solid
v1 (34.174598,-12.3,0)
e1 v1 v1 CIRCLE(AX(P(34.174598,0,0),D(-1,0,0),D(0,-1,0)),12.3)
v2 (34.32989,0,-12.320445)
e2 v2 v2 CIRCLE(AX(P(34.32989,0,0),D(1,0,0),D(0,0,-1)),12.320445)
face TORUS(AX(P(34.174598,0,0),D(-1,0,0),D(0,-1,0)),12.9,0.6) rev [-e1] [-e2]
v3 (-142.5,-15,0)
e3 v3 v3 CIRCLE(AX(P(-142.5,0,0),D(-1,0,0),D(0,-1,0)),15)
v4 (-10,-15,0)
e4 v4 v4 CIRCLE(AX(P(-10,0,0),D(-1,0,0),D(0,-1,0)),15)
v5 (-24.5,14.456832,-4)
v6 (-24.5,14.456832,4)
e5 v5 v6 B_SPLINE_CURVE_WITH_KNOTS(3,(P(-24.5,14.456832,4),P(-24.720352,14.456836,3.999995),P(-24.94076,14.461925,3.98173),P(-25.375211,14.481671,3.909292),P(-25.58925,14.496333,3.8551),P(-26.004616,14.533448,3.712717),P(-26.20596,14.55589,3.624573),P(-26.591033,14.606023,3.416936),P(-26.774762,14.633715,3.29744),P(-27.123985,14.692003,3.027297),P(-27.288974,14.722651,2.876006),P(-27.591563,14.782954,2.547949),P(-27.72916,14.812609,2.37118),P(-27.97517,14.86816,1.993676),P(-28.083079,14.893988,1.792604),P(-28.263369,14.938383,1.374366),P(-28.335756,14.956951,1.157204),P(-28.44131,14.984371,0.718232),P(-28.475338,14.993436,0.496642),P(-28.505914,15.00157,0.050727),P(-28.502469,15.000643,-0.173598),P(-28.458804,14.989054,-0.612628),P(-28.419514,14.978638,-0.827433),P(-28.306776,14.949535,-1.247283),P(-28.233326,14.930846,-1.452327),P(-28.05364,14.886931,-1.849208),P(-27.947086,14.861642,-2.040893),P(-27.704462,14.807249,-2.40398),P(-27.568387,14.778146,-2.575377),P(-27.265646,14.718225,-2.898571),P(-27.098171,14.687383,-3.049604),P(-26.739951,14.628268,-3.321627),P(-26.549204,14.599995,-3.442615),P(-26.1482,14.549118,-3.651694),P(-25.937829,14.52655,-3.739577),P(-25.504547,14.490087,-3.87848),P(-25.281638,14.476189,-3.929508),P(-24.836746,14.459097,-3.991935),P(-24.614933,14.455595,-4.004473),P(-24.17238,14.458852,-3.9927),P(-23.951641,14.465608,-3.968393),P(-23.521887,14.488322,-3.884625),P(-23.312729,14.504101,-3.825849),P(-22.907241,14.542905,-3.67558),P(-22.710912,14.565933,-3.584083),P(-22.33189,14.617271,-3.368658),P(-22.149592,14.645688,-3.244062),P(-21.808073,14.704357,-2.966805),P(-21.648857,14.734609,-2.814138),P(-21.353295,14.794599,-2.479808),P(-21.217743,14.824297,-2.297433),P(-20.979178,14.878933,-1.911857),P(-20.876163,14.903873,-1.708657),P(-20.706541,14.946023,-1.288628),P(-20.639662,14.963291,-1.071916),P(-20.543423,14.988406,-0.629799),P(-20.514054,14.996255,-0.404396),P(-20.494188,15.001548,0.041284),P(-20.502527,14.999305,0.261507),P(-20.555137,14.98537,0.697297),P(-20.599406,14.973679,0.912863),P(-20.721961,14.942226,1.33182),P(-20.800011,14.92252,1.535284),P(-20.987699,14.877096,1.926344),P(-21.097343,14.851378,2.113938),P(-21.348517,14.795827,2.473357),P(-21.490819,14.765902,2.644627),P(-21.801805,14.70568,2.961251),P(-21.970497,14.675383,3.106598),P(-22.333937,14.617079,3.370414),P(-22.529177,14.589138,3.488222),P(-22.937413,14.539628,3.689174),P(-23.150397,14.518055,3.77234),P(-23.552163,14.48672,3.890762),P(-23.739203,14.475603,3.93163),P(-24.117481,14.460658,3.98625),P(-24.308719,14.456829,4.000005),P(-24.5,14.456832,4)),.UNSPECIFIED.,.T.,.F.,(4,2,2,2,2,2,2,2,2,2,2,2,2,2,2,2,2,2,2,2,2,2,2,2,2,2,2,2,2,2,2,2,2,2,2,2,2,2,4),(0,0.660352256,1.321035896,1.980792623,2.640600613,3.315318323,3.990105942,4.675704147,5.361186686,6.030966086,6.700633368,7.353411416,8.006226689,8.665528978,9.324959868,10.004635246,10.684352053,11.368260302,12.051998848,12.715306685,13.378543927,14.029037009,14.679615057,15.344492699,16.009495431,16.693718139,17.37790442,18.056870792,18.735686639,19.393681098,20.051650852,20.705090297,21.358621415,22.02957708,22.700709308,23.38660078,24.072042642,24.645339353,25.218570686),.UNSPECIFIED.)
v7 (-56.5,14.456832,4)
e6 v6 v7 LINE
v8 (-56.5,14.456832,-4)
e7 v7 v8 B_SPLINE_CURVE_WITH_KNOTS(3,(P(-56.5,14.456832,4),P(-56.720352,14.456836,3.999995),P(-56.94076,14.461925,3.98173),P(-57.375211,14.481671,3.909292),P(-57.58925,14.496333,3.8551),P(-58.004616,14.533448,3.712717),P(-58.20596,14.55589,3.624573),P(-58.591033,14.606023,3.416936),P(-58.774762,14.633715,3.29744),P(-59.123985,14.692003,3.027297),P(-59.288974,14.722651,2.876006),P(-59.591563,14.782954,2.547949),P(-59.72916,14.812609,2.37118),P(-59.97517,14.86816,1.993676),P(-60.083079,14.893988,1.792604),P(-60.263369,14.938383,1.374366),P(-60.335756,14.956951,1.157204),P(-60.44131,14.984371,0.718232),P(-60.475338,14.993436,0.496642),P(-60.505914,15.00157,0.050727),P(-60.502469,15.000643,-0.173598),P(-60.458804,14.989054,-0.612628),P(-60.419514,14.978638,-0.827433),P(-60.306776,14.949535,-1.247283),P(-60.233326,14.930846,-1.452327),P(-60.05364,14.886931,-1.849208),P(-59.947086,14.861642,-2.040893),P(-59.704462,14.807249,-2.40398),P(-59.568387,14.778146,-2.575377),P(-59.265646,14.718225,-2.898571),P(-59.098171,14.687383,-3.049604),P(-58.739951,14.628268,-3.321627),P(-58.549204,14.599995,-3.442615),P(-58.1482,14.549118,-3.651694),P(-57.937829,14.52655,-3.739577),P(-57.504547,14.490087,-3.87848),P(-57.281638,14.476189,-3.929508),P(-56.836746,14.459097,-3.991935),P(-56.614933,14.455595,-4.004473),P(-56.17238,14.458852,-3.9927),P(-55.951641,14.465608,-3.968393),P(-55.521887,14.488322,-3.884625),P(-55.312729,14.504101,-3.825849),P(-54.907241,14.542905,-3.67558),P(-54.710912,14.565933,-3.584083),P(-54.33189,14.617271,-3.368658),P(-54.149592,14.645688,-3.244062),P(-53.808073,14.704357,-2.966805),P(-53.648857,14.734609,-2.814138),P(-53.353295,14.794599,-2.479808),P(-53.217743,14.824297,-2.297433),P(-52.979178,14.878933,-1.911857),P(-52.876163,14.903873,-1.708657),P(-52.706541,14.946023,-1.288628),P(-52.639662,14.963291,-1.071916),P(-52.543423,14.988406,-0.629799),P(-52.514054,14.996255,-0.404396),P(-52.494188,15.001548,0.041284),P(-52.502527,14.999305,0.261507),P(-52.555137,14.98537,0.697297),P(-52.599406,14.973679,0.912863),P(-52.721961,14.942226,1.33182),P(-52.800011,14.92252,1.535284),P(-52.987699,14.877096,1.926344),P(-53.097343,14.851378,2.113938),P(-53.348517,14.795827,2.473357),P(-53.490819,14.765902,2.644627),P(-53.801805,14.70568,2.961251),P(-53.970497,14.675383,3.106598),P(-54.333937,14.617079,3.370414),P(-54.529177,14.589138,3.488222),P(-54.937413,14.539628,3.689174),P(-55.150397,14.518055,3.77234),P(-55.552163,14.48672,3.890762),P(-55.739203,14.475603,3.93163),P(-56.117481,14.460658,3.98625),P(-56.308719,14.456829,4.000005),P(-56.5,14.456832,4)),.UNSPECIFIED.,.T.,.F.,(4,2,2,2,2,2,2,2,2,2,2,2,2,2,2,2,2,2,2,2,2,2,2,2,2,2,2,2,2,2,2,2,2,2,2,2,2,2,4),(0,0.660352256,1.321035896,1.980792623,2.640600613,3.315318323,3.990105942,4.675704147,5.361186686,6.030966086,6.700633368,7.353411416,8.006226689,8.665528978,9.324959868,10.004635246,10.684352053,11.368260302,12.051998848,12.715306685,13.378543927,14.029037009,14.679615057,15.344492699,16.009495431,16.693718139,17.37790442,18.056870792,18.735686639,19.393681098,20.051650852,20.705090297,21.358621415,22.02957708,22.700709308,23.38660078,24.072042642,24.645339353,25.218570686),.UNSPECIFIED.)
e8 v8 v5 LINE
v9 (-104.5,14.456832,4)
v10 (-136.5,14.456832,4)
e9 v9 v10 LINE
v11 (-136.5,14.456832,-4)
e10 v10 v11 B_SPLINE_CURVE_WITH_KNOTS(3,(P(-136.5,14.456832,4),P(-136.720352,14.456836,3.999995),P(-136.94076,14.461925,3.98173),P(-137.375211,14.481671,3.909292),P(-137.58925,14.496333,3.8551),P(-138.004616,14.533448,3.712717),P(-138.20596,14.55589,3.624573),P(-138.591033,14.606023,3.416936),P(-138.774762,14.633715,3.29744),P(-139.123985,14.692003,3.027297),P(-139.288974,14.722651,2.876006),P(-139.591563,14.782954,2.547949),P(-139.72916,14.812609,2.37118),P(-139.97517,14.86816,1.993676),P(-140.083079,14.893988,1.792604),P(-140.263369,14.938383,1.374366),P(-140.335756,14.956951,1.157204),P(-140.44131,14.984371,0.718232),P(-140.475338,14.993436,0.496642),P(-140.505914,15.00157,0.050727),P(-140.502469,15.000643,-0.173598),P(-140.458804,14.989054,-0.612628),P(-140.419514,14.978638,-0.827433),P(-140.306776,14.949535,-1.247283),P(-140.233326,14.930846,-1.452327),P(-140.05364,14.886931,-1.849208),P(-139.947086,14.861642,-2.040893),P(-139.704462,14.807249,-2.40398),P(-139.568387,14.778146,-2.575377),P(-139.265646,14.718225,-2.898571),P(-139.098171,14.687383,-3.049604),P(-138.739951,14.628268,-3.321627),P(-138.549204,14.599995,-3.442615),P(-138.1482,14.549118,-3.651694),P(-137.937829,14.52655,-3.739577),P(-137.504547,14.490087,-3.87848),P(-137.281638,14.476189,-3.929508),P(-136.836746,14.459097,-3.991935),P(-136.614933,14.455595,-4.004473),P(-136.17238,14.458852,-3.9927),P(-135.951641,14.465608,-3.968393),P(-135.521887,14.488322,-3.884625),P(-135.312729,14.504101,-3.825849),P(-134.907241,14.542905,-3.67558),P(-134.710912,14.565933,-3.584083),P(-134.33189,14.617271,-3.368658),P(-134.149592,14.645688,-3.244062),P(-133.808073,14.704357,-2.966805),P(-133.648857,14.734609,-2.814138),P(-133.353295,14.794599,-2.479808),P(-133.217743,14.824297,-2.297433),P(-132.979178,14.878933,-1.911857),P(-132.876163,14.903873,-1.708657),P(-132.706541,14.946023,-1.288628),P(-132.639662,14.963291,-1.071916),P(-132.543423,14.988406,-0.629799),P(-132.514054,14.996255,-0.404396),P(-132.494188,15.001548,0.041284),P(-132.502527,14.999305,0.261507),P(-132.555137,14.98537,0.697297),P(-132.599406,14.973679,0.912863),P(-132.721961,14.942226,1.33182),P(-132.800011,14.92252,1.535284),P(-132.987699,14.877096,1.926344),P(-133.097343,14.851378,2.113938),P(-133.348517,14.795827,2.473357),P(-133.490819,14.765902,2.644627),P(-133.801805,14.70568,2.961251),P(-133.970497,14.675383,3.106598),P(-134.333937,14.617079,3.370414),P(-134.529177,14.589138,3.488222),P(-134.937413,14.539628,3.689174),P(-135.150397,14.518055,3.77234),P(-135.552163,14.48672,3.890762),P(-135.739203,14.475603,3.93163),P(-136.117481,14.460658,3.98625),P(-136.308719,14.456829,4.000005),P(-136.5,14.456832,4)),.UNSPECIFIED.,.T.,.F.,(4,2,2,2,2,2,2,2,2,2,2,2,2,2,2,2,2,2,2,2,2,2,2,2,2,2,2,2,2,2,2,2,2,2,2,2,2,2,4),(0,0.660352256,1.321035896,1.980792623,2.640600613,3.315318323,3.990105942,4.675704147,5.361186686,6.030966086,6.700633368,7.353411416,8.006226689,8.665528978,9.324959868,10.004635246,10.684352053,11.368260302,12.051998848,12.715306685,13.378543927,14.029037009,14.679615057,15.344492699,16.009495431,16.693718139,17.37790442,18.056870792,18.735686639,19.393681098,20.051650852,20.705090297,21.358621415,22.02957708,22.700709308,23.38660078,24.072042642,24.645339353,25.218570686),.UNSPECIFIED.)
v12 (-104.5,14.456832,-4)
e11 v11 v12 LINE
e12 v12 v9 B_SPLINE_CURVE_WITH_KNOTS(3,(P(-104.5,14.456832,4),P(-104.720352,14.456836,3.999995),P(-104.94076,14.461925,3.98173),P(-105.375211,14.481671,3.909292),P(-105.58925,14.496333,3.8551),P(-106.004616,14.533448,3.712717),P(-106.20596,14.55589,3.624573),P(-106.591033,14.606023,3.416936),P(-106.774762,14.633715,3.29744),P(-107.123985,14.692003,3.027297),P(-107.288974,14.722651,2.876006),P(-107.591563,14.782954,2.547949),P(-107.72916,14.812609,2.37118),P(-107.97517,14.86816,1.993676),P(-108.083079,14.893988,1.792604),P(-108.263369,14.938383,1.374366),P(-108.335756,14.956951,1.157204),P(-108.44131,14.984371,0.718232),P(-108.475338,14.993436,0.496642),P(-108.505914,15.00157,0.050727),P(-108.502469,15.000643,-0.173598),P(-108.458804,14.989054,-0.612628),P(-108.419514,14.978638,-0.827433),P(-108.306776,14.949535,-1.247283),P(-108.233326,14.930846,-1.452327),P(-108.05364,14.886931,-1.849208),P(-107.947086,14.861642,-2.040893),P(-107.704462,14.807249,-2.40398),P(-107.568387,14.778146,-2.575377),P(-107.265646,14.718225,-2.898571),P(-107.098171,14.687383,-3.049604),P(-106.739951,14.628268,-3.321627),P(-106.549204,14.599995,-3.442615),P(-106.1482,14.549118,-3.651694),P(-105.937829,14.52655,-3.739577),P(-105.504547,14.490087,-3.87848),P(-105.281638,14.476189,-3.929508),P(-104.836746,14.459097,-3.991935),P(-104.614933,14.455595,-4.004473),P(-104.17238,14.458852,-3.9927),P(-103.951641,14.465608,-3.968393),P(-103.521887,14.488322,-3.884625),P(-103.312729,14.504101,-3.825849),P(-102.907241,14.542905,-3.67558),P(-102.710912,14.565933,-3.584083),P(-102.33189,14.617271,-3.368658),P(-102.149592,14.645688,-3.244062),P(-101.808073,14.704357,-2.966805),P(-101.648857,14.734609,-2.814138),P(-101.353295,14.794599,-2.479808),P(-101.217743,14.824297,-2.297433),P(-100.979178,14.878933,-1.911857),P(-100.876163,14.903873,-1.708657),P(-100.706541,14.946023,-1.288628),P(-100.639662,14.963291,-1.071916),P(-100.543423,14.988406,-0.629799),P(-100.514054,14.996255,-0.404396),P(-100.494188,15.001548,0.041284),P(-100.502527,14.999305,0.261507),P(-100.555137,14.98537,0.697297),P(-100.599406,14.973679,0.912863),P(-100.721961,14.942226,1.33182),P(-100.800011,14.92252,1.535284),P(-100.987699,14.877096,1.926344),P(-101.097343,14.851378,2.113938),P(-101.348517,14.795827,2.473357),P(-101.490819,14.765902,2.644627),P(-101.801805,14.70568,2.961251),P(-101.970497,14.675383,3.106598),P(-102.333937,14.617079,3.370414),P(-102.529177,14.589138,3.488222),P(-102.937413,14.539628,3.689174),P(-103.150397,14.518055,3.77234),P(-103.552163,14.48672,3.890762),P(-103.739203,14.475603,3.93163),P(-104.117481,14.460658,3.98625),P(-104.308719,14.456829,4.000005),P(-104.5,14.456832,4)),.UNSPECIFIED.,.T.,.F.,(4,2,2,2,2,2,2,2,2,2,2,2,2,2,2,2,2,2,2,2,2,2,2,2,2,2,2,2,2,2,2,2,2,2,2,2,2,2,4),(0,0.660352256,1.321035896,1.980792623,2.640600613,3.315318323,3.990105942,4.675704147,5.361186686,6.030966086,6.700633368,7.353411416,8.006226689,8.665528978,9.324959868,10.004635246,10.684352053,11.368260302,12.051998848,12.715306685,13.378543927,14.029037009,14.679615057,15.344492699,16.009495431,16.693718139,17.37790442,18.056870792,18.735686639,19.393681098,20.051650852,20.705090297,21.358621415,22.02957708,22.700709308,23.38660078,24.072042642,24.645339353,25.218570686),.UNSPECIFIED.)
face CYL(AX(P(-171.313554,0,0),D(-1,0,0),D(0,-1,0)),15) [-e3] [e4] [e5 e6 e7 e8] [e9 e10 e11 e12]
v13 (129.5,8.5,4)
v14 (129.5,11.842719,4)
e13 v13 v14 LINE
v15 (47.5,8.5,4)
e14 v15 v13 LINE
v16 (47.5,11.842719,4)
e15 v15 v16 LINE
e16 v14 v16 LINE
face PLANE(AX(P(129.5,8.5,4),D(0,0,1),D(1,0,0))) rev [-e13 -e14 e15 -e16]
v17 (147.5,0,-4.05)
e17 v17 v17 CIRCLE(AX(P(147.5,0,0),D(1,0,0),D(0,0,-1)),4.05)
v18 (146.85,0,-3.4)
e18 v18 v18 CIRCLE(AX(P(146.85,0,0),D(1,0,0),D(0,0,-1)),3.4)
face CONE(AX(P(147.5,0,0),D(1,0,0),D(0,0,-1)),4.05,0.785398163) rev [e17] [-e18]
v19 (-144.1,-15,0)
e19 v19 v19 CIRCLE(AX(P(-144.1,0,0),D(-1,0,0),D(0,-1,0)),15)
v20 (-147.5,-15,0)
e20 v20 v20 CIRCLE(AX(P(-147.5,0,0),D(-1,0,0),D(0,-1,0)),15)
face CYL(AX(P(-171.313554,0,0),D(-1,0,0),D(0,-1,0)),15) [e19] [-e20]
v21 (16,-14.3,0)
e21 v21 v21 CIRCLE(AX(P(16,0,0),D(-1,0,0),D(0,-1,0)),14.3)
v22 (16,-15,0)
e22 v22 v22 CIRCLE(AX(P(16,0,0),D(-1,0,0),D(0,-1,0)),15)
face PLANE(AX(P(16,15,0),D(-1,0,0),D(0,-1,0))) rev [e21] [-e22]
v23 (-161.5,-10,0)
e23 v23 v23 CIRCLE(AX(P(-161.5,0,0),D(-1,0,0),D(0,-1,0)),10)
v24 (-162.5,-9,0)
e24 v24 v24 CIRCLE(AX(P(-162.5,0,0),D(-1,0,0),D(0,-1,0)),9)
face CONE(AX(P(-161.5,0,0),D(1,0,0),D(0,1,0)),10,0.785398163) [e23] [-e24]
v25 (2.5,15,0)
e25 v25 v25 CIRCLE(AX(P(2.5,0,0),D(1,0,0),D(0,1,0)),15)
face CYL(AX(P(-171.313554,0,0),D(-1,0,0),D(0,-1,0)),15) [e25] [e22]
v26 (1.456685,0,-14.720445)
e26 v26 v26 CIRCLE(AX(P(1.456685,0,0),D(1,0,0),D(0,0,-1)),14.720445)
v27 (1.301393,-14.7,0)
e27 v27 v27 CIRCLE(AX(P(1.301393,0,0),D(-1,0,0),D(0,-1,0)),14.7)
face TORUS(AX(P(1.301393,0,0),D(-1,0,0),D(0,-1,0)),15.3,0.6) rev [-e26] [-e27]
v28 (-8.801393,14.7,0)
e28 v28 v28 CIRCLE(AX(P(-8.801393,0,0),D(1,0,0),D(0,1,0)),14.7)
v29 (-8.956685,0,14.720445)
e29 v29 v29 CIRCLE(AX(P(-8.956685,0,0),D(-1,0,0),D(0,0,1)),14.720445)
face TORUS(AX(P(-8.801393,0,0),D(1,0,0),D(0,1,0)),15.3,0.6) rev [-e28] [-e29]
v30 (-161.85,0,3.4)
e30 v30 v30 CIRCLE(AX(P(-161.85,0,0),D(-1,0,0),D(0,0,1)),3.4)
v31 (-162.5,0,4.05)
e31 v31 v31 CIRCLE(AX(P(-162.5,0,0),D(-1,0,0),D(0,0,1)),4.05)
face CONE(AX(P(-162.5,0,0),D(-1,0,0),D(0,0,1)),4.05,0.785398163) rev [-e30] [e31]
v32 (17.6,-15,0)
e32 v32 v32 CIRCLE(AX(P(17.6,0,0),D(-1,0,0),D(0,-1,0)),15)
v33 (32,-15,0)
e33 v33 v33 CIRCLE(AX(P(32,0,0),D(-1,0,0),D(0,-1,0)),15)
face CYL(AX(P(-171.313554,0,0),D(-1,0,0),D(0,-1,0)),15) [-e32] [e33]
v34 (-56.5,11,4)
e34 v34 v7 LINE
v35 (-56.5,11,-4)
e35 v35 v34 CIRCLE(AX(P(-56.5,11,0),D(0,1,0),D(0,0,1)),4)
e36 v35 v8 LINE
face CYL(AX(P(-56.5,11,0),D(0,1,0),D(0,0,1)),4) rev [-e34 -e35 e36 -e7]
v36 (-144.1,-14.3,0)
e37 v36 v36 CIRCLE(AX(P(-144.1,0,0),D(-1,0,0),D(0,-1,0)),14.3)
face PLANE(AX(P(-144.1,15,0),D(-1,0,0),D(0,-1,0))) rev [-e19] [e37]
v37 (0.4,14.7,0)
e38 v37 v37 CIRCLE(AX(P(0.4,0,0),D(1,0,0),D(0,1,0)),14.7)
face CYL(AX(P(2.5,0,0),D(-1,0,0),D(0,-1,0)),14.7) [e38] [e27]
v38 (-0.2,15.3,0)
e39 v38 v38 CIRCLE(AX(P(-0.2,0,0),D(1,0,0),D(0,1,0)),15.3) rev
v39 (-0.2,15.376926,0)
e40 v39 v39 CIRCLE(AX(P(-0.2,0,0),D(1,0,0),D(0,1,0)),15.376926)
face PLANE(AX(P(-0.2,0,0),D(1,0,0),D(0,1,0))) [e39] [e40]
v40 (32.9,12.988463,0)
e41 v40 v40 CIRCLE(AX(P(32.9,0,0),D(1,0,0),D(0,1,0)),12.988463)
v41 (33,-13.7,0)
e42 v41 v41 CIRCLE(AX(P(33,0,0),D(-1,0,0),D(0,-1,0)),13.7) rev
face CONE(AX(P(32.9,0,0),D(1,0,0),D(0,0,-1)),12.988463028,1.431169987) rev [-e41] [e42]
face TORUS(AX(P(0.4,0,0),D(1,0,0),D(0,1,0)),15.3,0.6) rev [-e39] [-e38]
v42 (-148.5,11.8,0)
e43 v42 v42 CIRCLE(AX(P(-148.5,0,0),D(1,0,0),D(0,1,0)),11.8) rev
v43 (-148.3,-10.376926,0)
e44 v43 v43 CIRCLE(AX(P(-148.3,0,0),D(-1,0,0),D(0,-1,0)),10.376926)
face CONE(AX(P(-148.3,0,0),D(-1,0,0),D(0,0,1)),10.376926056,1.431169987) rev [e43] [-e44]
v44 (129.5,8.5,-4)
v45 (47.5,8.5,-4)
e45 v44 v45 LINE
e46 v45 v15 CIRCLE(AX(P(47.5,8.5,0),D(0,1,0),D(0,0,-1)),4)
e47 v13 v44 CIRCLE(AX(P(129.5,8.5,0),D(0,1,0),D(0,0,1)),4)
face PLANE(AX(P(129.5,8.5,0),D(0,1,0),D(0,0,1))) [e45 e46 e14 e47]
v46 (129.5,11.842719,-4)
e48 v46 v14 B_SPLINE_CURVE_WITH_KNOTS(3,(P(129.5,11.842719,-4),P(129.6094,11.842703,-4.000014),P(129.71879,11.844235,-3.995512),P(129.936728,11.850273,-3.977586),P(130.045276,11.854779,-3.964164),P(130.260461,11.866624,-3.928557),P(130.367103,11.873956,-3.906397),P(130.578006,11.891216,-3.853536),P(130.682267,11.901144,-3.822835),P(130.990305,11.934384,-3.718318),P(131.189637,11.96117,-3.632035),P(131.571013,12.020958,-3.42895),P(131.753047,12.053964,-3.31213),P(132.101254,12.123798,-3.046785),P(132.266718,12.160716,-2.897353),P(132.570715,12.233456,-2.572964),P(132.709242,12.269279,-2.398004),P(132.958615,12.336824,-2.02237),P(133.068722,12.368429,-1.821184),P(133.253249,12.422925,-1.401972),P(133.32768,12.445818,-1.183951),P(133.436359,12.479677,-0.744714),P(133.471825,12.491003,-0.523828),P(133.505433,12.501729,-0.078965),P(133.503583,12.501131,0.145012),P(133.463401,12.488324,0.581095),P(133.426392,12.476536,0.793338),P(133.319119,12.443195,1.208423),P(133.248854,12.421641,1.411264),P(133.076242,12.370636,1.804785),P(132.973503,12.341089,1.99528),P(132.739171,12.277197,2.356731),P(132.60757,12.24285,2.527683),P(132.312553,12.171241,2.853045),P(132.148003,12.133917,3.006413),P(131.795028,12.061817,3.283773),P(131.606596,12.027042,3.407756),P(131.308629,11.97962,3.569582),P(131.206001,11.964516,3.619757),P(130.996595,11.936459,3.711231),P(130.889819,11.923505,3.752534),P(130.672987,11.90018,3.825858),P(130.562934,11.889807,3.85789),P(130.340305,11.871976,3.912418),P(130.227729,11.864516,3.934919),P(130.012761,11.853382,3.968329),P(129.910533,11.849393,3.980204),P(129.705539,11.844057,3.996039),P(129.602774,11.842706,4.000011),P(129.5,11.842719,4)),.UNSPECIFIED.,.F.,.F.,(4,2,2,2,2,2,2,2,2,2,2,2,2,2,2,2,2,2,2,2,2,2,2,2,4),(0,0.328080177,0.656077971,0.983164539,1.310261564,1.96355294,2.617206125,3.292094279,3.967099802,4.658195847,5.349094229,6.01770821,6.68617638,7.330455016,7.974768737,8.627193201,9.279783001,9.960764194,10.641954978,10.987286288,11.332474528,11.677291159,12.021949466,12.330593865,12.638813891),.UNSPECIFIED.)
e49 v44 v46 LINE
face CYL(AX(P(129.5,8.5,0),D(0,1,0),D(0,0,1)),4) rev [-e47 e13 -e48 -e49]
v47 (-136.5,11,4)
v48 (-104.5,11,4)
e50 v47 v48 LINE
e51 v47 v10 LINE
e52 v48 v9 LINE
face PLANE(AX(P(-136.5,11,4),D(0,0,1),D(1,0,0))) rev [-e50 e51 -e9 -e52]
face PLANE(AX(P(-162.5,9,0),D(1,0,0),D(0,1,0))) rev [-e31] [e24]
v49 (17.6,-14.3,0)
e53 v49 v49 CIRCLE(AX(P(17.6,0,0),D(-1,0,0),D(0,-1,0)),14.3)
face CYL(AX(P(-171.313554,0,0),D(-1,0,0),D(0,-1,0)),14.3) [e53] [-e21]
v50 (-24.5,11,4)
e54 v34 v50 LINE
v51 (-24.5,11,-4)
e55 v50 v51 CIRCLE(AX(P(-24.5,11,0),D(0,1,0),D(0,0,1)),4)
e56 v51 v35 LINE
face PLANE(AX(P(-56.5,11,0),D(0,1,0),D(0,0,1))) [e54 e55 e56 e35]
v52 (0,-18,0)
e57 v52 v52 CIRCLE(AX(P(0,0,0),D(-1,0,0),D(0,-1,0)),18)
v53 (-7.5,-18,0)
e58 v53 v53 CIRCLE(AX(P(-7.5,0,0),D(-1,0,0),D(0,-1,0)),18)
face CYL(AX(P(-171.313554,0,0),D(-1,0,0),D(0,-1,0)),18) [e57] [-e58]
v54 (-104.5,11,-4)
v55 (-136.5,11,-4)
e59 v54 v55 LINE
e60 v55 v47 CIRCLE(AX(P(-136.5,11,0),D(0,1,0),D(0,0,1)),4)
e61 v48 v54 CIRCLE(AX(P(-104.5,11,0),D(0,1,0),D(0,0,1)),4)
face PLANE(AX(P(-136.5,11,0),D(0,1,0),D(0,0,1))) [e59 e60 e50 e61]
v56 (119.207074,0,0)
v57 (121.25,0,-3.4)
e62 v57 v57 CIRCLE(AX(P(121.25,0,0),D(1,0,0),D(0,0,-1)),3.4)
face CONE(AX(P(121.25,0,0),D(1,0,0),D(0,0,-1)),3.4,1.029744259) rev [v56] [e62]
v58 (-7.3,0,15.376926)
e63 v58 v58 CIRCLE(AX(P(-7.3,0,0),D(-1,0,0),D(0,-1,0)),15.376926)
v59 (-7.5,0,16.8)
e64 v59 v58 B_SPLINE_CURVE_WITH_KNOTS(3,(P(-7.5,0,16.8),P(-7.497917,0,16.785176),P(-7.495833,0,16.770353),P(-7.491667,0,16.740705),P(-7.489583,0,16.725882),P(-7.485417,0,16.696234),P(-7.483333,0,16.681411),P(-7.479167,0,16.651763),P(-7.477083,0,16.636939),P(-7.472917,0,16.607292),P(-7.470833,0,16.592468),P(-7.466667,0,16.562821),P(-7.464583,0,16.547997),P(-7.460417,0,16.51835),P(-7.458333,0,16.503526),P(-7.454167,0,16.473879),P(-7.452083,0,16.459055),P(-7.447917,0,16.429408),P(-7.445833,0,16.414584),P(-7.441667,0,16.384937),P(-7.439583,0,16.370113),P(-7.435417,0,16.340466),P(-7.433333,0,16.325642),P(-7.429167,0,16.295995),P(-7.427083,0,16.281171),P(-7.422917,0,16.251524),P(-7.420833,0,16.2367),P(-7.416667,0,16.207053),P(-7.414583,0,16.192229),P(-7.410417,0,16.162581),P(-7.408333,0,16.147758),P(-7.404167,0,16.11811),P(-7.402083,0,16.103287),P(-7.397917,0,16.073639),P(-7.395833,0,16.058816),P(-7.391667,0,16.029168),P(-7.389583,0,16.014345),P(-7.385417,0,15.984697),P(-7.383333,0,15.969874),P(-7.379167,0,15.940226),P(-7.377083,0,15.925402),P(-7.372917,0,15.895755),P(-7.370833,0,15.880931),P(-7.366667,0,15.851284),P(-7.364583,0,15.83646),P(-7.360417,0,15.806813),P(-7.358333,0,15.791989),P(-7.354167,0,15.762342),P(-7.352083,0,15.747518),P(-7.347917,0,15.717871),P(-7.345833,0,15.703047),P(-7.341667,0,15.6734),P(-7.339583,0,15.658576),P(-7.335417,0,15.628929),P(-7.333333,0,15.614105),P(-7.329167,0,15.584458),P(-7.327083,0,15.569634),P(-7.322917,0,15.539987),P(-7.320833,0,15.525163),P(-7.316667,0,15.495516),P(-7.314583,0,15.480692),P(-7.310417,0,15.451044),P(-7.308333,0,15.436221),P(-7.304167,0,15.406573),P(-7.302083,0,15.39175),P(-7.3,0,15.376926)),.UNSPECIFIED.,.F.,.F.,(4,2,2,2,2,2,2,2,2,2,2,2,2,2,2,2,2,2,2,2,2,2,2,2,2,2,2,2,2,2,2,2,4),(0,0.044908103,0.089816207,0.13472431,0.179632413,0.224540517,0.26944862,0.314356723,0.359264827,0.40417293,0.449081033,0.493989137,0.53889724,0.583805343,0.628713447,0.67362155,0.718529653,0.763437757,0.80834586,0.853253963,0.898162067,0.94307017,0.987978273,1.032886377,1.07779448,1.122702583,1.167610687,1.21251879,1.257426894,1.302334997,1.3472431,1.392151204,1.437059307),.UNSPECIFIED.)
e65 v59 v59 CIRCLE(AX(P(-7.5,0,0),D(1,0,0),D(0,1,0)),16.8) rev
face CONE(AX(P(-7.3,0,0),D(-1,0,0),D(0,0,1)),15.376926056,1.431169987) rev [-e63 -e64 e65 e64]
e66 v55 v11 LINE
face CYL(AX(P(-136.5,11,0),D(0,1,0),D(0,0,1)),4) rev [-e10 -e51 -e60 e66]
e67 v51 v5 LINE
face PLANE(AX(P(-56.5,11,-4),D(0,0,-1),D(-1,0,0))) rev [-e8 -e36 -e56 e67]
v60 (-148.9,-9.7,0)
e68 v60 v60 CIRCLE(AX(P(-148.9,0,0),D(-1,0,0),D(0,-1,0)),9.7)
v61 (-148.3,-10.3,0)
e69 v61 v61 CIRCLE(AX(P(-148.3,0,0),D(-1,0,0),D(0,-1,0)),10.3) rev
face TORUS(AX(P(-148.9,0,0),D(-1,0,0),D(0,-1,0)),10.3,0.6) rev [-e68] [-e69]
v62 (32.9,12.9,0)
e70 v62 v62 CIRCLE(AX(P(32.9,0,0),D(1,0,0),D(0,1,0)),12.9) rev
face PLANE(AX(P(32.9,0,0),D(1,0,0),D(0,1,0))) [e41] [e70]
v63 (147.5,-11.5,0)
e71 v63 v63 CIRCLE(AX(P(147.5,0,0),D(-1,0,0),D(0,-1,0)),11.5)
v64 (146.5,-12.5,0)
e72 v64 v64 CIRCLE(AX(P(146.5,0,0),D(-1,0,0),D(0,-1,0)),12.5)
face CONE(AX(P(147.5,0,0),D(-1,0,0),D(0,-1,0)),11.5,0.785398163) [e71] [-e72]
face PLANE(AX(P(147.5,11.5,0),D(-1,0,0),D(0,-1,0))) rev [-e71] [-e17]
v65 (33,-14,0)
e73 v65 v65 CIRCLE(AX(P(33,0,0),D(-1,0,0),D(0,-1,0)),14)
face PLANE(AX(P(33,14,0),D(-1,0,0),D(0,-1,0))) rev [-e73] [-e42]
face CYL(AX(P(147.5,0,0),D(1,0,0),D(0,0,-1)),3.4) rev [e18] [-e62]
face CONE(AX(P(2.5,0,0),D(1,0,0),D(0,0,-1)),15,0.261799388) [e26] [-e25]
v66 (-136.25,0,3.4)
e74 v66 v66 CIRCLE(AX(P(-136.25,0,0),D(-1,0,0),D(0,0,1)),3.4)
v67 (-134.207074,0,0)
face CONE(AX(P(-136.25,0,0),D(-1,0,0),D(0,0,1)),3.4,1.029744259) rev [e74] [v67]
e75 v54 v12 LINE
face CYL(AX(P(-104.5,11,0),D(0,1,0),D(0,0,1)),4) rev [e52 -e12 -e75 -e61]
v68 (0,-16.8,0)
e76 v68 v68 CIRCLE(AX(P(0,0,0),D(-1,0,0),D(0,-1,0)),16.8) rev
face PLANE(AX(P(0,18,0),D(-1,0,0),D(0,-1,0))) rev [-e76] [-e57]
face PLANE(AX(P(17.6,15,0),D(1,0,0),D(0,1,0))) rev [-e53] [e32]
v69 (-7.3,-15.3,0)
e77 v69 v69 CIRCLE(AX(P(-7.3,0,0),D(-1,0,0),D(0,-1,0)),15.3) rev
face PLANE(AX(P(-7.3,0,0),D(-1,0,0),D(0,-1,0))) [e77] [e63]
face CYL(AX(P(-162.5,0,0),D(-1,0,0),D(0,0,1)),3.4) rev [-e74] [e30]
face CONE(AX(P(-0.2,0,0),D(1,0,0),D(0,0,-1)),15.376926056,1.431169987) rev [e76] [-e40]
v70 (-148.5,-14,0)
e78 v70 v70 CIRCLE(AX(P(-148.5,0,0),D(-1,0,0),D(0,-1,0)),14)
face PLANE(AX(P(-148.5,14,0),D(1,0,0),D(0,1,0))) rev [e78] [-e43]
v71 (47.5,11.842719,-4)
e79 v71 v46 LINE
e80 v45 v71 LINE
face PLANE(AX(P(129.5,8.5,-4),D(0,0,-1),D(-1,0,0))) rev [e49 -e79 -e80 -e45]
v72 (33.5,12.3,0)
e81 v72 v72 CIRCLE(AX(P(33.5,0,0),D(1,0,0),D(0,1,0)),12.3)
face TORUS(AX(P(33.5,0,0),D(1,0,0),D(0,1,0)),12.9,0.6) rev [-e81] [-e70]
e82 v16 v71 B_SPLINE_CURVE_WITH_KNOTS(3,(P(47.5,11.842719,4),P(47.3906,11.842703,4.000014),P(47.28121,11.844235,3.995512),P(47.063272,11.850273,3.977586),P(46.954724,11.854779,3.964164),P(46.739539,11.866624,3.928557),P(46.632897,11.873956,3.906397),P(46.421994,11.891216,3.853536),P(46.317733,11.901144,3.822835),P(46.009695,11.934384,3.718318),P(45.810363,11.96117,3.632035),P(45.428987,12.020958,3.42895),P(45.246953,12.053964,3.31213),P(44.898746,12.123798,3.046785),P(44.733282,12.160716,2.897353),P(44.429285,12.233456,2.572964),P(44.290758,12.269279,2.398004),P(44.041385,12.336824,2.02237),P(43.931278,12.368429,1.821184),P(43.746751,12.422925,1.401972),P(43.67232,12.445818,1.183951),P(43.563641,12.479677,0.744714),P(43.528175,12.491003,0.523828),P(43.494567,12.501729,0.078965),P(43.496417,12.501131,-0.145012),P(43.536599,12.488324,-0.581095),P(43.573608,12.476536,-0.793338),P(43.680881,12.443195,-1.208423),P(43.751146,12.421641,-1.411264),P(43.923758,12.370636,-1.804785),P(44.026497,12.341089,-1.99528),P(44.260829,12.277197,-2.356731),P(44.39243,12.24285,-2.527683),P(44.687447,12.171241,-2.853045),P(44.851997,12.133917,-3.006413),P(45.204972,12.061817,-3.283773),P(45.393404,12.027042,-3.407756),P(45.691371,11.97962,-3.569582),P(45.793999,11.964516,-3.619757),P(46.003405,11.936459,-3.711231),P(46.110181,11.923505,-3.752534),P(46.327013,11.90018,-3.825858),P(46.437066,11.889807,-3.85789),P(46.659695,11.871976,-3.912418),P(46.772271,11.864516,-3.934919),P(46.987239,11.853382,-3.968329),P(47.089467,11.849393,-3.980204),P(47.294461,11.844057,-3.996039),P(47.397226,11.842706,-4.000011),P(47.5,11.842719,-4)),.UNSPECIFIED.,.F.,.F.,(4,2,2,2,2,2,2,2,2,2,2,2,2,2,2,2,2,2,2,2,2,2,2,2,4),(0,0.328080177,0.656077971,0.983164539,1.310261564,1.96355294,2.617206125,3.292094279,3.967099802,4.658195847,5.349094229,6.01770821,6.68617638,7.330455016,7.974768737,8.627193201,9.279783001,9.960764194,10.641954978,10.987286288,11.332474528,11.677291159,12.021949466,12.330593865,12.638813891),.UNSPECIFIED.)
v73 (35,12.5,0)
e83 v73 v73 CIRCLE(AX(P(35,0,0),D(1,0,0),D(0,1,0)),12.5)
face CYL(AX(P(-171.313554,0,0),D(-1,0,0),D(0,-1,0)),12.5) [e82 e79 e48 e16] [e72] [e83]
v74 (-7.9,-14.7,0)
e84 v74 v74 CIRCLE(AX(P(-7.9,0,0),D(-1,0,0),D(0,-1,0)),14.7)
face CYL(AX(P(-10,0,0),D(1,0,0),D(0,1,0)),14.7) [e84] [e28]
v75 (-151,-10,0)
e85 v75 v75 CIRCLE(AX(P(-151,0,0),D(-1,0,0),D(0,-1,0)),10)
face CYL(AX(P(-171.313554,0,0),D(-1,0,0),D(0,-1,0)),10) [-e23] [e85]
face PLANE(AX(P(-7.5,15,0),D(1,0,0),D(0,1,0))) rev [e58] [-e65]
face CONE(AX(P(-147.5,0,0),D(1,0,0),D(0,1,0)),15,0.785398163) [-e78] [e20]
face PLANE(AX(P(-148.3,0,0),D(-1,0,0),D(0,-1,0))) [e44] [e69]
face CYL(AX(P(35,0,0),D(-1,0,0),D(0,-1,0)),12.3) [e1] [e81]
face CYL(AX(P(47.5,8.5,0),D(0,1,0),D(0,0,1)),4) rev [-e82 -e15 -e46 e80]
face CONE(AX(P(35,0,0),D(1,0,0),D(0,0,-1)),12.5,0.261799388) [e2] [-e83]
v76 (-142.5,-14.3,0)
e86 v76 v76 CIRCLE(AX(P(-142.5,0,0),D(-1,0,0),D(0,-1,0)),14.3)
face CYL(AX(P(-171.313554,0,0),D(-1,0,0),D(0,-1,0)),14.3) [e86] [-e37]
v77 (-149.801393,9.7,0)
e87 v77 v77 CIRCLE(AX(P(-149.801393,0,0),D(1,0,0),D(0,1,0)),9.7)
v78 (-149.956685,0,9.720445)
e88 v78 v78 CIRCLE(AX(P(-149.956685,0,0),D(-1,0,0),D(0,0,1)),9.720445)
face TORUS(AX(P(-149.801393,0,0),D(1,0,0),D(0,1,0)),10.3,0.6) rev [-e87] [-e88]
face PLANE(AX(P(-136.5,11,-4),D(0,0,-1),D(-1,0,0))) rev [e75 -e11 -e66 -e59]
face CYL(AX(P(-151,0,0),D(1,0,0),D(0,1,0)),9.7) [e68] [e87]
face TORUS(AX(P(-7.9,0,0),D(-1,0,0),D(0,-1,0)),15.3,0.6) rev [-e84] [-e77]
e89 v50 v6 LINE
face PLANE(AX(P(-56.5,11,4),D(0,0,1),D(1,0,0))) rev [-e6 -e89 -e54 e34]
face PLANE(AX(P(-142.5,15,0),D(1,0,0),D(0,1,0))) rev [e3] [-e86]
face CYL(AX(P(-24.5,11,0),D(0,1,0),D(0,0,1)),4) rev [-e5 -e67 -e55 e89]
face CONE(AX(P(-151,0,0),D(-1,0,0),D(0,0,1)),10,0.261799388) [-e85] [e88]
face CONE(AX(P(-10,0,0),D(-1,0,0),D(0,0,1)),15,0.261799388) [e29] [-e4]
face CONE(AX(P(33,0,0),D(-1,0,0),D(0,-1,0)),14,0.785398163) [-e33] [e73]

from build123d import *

# Parameters (mm, degrees)
SCHNITT_LINEAR_AUSTRAGEN1_DEPTH = 4
M8_GEWINDEBOHRUNG1_D            = 6.8
M8_GEWINDEBOHRUNG1_DEPTH        = 26.25
M8_GEWINDEBOHRUNG1_CSINK_D      = 8.1
M8_GEWINDEBOHRUNG1_CSINK_ANGLE  = 90
M8_GEWINDEBOHRUNG1_TIP          = 2.042926105
M8_GEWINDEBOHRUNG2_D            = 6.8
M8_GEWINDEBOHRUNG2_DEPTH        = 26.25
M8_GEWINDEBOHRUNG2_CSINK_D      = 8.1
M8_GEWINDEBOHRUNG2_CSINK_ANGLE  = 90
M8_GEWINDEBOHRUNG2_TIP          = 2.042926105
SCHNITT_LINEAR_AUSTRAGEN2_DEPTH = 4
SCHNITT_F_T2_DEPTH              = 2.5
SCHNITT_F_T2_DEPTH_BACK         = 0.2
G_T1_R                          = 16.8
G_T1_R_2                        = 14.7
FASE_8_T2_SIZE2                 = 1.423073944
FASE_8_T2_SIZE                  = 0.2
RADIUS_R_R                      = 0.6
SCHNITT_F_T21_DEPTH             = 2.5
SCHNITT_F_T21_DEPTH_BACK        = 0.2
G_T11_R                         = 16.8
G_T11_R_2                       = 14.7
FASE_8_T21_SIZE2                = 1.423073944
FASE_8_T21_SIZE                 = 0.2
RADIUS_R1_R                     = 0.6
SCHNITT_F_T23_DEPTH             = 2
SCHNITT_F_T23_DEPTH_BACK        = 0.1
G_T13_R                         = 13.7
G_T13_R_2                       = 12.3
FASE_8_T23_SIZE2                = 0.711536972
FASE_8_T23_SIZE                 = 0.1
RADIUS_R3_R                     = 0.6
SCHNITT_F_T24_DEPTH             = 2.5
SCHNITT_F_T24_DEPTH_BACK        = 0.2
G_T14_R                         = 11.8
G_T14_R_2                       = 9.7
FASE_8_T24_SIZE2                = 1.423073944
FASE_8_T24_SIZE                 = 0.2
RADIUS_R4_R                     = 0.6


with BuildPart() as part:
    # Skizze1 → Basis-Rotation (revolve)
    with BuildSketch(Plane.XY, mode=Mode.PRIVATE) as basis_rotation_sk:
        Polygon((-162.5, 9), (-162.5, 0), (147.5, 0), (147.5, 11.5), (146.5, 12.5), (33, 12.5), (33, 14), (32, 15), (17.6, 15), (17.6, 14.3), (16, 14.3), (16, 15), (0, 15), (0, 18), (-7.5, 18), (-7.5, 15), (-142.5, 15), (-142.5, 14.3), (-144.1, 14.3), (-144.1, 15), (-147.5, 15), (-148.5, 14), (-148.5, 10), (-161.5, 10), align=None)
    revolve(basis_rotation_sk.sketch.rotate(Axis((-171.313553592, 0, 0), (1, 0, 0)), 180), axis=Axis((-171.313553592, 0, 0), (1, 0, 0)))

    # Skizze2 → Schnitt-Linear austragen1 (cut)
    with BuildSketch(Plane(origin=(0, 12.5, 0), x_dir=(-1, 0, 0), z_dir=(0, 1, 0))):
        with BuildLine():
            Line((-129.5, 4), (-47.5, 4))
            ThreePointArc((-47.5, 4), (-43.5, 0), (-47.5, -4))
            Line((-47.5, -4), (-129.5, -4))
            ThreePointArc((-129.5, -4), (-133.5, 0), (-129.5, 4))
        make_face()
    extrude(amount=-SCHNITT_LINEAR_AUSTRAGEN1_DEPTH, mode=Mode.SUBTRACT)

    # M8 Gewindebohrung1
    with Locations(Plane.ZY.offset(162.5)):
        with Locations((0, 0)):
            CounterSinkHole(M8_GEWINDEBOHRUNG1_D / 2, M8_GEWINDEBOHRUNG1_CSINK_D / 2, depth=M8_GEWINDEBOHRUNG1_DEPTH, counter_sink_angle=M8_GEWINDEBOHRUNG1_CSINK_ANGLE)
            with Locations((0, 0, -(M8_GEWINDEBOHRUNG1_DEPTH + M8_GEWINDEBOHRUNG1_TIP / 2))):  # 118° drill point
                Cone(0, M8_GEWINDEBOHRUNG1_D / 2, M8_GEWINDEBOHRUNG1_TIP, mode=Mode.SUBTRACT)

    # M8 Gewindebohrung2
    with Locations(Plane(origin=(147.5, 0, 0), x_dir=(0, 0, -1), z_dir=(1, 0, 0))):
        with Locations((0, 0)):
            CounterSinkHole(M8_GEWINDEBOHRUNG2_D / 2, M8_GEWINDEBOHRUNG2_CSINK_D / 2, depth=M8_GEWINDEBOHRUNG2_DEPTH, counter_sink_angle=M8_GEWINDEBOHRUNG2_CSINK_ANGLE)
            with Locations((0, 0, -(M8_GEWINDEBOHRUNG2_DEPTH + M8_GEWINDEBOHRUNG2_TIP / 2))):  # 118° drill point
                Cone(0, M8_GEWINDEBOHRUNG2_D / 2, M8_GEWINDEBOHRUNG2_TIP, mode=Mode.SUBTRACT)

    # Skizze7 → Schnitt-Linear austragen2 (cut)
    with BuildSketch(Plane(origin=(0, 15, 0), x_dir=(1, 0, 0), z_dir=(0, 1, 0))):
        with BuildLine():
            Line((-136.5, 4), (-104.5, 4))
            ThreePointArc((-104.5, 4), (-100.5, 0), (-104.5, -4))
            Line((-104.5, -4), (-136.5, -4))
            ThreePointArc((-136.5, -4), (-140.5, 0), (-136.5, 4))
        make_face()
        with BuildLine():
            Line((-56.5, 4), (-24.5, 4))
            ThreePointArc((-24.5, 4), (-20.5, 0), (-24.5, -4))
            Line((-24.5, -4), (-56.5, -4))
            ThreePointArc((-56.5, -4), (-60.5, 0), (-56.5, 4))
        make_face()
    extrude(amount=-SCHNITT_LINEAR_AUSTRAGEN2_DEPTH, mode=Mode.SUBTRACT)

    # g+t1 → Schnitt f+t2 (cut, two sides: drawn at the far end of the back side and taken through both)
    with BuildSketch(Plane(origin=(0, 15.68322907, -5.369686321), x_dir=(0, 0, -1), z_dir=(1, 0, 0)).offset(-SCHNITT_F_T2_DEPTH_BACK)):
        with Locations(Location((-5.369686321, -15.68322907, 0), (0, 0, 270))):
            Circle(G_T1_R)
        with Locations(Location((-5.369686321, -15.68322907, 0), (0, 0, 90))):
            Circle(G_T1_R_2, mode=Mode.SUBTRACT)
    extrude(amount=SCHNITT_F_T2_DEPTH + SCHNITT_F_T2_DEPTH_BACK, mode=Mode.SUBTRACT)

    # Fase 15° t1: read off the stored shape, not the designer's step
    # Fase 15° t1 outline → Fase 15° t1 (revolve)
    with BuildSketch(Plane.YX):
        Polygon((14.7, 2.5), (14.7, 1.380384758), (15, 2.5), align=None)
    revolve(axis=Axis((0, 0, 0), (1, 0, 0)))

    # Fase 8° t2
    fase_8_t2_edges = [part.edges().sort_by_distance(p)[0] for p in [
        (-0.2, 16.8, 0),
    ]]
    fase_8_t2_side = [part.faces().sort_by_distance(p)[0] for p in [
        (-0.196, 16.8, 0),
    ]]
    chamfer(fase_8_t2_edges, length=FASE_8_T2_SIZE - 0.0001, length2=FASE_8_T2_SIZE2 - 0.0001, reference=fase_8_t2_side[0])  # a hair under: the kernel refuses the full size

    # Radius r
    radius_r_edges = [part.edges().sort_by_distance(p)[0] for p in [
        (-0.2, -14.7, 0),
        (1.380384758, -14.7, 0),
    ]]
    fillet(radius_r_edges, radius=RADIUS_R_R)

    # g+t11 → Schnitt f+t21 (cut, two sides: drawn at the far end of the back side and taken through both)
    with BuildSketch(Plane(origin=(-7.5, 15.606103007, 0.578312963), x_dir=(0, 0, 1), z_dir=(-1, 0, 0)).offset(-SCHNITT_F_T21_DEPTH_BACK)):
        with Locations(Location((-0.578312963, -15.606103007, 0), (0, 0, 90))):
            Circle(G_T11_R)
        with Locations(Location((-0.578312963, -15.606103007, 0), (0, 0, 270))):
            Circle(G_T11_R_2, mode=Mode.SUBTRACT)
    extrude(amount=SCHNITT_F_T21_DEPTH + SCHNITT_F_T21_DEPTH_BACK, mode=Mode.SUBTRACT)

    # Fase 15° t11: read off the stored shape, not the designer's step
    # Fase 15° t11 outline → Fase 15° t11 (revolve)
    with BuildSketch(Plane.YX):
        Polygon((15, -10), (14.7, -8.880384758), (14.7, -10), align=None)
    revolve(axis=Axis((0, 0, 0), (1, 0, 0)))

    # Fase 8° t21
    fase_8_t21_edges = [part.edges().sort_by_distance(p)[0] for p in [
        (-7.3, -16.8, 0),
    ]]
    fase_8_t21_side = [part.faces().sort_by_distance(p)[0] for p in [
        (-7.304, -16.8, 0),
    ]]
    chamfer(fase_8_t21_edges, length=FASE_8_T21_SIZE - 0.0001, length2=FASE_8_T21_SIZE2 - 0.0001, reference=fase_8_t21_side[0])  # a hair under: the kernel refuses the full size

    # Radius r1
    radius_r1_edges = [part.edges().sort_by_distance(p)[0] for p in [
        (-7.3, 14.7, 0),
        (-8.880384758, 0, 14.7),
    ]]
    fillet(radius_r1_edges, radius=RADIUS_R1_R)

    # g+t13 → Schnitt f+t23 (cut, two sides: drawn at the far end of the back side and taken through both)
    with BuildSketch(Plane(origin=(33, -2.98315193, 12.673044335), x_dir=(0, 0, -1), z_dir=(1, 0, 0)).offset(-SCHNITT_F_T23_DEPTH_BACK)):
        with Locations(Location((12.673044335, 2.98315193, 0), (0, 0, 270))):
            Circle(G_T13_R)
        with Locations(Location((12.673044335, 2.98315193, 0), (0, 0, 90))):
            Circle(G_T13_R_2, mode=Mode.SUBTRACT)
    extrude(amount=SCHNITT_F_T23_DEPTH + SCHNITT_F_T23_DEPTH_BACK, mode=Mode.SUBTRACT)

    # Fase 15° t13: read off the stored shape, not the designer's step
    # Fase 15° t13 outline → Fase 15° t13 (revolve)
    with BuildSketch(Plane.YX):
        Polygon((12.3, 35), (12.3, 34.253589838), (12.5, 35), align=None)
    revolve(axis=Axis((0, 0, 0), (1, 0, 0)))

    # Fase 8° t23
    fase_8_t23_edges = [part.edges().sort_by_distance(p)[0] for p in [
        (32.9, 13.7, 0),
    ]]
    fase_8_t23_side = [part.faces().sort_by_distance(p)[0] for p in [
        (32.902, 13.7, 0),
    ]]
    chamfer(fase_8_t23_edges, length=FASE_8_T23_SIZE - 0.0001, length2=FASE_8_T23_SIZE2 - 0.0001, reference=fase_8_t23_side[0])  # a hair under: the kernel refuses the full size

    # Radius r3
    radius_r3_edges = [part.edges().sort_by_distance(p)[0] for p in [
        (32.9, -12.3, 0),
        (34.253589838, -12.3, 0),
    ]]
    fillet(radius_r3_edges, radius=RADIUS_R3_R)

    # g+t14 → Schnitt f+t24 (cut, two sides: drawn at the far end of the back side and taken through both)
    with BuildSketch(Plane(origin=(-148.5, 10.196326486, -4.264703849), x_dir=(0, 0, 1), z_dir=(-1, 0, 0)).offset(-SCHNITT_F_T24_DEPTH_BACK)):
        with Locations(Location((4.264703849, -10.196326486, 0), (0, 0, 90))):
            Circle(G_T14_R)
        with Locations(Location((4.264703849, -10.196326486, 0), (0, 0, 270))):
            Circle(G_T14_R_2, mode=Mode.SUBTRACT)
    extrude(amount=SCHNITT_F_T24_DEPTH + SCHNITT_F_T24_DEPTH_BACK, mode=Mode.SUBTRACT)

    # Fase 15° t14: read off the stored shape, not the designer's step
    # Fase 15° t14 outline → Fase 15° t14 (revolve)
    with BuildSketch(Plane.YX):
        Polygon((10, -151), (9.7, -149.880384758), (9.7, -151), align=None)
    revolve(axis=Axis((0, 0, 0), (1, 0, 0)))

    # Fase 8° t24
    fase_8_t24_edges = [part.edges().sort_by_distance(p)[0] for p in [
        (-148.3, -11.8, 0),
    ]]
    fase_8_t24_side = [part.faces().sort_by_distance(p)[0] for p in [
        (-148.304, -11.8, 0),
    ]]
    chamfer(fase_8_t24_edges, length=FASE_8_T24_SIZE - 0.0001, length2=FASE_8_T24_SIZE2 - 0.0001, reference=fase_8_t24_side[0])  # a hair under: the kernel refuses the full size

    # Radius r4
    radius_r4_edges = [part.edges().sort_by_distance(p)[0] for p in [
        (-148.3, 9.7, 0),
        (-149.880384758, 0, 9.7),
    ]]
    fillet(radius_r4_edges, radius=RADIUS_R4_R)


solid = part.part
